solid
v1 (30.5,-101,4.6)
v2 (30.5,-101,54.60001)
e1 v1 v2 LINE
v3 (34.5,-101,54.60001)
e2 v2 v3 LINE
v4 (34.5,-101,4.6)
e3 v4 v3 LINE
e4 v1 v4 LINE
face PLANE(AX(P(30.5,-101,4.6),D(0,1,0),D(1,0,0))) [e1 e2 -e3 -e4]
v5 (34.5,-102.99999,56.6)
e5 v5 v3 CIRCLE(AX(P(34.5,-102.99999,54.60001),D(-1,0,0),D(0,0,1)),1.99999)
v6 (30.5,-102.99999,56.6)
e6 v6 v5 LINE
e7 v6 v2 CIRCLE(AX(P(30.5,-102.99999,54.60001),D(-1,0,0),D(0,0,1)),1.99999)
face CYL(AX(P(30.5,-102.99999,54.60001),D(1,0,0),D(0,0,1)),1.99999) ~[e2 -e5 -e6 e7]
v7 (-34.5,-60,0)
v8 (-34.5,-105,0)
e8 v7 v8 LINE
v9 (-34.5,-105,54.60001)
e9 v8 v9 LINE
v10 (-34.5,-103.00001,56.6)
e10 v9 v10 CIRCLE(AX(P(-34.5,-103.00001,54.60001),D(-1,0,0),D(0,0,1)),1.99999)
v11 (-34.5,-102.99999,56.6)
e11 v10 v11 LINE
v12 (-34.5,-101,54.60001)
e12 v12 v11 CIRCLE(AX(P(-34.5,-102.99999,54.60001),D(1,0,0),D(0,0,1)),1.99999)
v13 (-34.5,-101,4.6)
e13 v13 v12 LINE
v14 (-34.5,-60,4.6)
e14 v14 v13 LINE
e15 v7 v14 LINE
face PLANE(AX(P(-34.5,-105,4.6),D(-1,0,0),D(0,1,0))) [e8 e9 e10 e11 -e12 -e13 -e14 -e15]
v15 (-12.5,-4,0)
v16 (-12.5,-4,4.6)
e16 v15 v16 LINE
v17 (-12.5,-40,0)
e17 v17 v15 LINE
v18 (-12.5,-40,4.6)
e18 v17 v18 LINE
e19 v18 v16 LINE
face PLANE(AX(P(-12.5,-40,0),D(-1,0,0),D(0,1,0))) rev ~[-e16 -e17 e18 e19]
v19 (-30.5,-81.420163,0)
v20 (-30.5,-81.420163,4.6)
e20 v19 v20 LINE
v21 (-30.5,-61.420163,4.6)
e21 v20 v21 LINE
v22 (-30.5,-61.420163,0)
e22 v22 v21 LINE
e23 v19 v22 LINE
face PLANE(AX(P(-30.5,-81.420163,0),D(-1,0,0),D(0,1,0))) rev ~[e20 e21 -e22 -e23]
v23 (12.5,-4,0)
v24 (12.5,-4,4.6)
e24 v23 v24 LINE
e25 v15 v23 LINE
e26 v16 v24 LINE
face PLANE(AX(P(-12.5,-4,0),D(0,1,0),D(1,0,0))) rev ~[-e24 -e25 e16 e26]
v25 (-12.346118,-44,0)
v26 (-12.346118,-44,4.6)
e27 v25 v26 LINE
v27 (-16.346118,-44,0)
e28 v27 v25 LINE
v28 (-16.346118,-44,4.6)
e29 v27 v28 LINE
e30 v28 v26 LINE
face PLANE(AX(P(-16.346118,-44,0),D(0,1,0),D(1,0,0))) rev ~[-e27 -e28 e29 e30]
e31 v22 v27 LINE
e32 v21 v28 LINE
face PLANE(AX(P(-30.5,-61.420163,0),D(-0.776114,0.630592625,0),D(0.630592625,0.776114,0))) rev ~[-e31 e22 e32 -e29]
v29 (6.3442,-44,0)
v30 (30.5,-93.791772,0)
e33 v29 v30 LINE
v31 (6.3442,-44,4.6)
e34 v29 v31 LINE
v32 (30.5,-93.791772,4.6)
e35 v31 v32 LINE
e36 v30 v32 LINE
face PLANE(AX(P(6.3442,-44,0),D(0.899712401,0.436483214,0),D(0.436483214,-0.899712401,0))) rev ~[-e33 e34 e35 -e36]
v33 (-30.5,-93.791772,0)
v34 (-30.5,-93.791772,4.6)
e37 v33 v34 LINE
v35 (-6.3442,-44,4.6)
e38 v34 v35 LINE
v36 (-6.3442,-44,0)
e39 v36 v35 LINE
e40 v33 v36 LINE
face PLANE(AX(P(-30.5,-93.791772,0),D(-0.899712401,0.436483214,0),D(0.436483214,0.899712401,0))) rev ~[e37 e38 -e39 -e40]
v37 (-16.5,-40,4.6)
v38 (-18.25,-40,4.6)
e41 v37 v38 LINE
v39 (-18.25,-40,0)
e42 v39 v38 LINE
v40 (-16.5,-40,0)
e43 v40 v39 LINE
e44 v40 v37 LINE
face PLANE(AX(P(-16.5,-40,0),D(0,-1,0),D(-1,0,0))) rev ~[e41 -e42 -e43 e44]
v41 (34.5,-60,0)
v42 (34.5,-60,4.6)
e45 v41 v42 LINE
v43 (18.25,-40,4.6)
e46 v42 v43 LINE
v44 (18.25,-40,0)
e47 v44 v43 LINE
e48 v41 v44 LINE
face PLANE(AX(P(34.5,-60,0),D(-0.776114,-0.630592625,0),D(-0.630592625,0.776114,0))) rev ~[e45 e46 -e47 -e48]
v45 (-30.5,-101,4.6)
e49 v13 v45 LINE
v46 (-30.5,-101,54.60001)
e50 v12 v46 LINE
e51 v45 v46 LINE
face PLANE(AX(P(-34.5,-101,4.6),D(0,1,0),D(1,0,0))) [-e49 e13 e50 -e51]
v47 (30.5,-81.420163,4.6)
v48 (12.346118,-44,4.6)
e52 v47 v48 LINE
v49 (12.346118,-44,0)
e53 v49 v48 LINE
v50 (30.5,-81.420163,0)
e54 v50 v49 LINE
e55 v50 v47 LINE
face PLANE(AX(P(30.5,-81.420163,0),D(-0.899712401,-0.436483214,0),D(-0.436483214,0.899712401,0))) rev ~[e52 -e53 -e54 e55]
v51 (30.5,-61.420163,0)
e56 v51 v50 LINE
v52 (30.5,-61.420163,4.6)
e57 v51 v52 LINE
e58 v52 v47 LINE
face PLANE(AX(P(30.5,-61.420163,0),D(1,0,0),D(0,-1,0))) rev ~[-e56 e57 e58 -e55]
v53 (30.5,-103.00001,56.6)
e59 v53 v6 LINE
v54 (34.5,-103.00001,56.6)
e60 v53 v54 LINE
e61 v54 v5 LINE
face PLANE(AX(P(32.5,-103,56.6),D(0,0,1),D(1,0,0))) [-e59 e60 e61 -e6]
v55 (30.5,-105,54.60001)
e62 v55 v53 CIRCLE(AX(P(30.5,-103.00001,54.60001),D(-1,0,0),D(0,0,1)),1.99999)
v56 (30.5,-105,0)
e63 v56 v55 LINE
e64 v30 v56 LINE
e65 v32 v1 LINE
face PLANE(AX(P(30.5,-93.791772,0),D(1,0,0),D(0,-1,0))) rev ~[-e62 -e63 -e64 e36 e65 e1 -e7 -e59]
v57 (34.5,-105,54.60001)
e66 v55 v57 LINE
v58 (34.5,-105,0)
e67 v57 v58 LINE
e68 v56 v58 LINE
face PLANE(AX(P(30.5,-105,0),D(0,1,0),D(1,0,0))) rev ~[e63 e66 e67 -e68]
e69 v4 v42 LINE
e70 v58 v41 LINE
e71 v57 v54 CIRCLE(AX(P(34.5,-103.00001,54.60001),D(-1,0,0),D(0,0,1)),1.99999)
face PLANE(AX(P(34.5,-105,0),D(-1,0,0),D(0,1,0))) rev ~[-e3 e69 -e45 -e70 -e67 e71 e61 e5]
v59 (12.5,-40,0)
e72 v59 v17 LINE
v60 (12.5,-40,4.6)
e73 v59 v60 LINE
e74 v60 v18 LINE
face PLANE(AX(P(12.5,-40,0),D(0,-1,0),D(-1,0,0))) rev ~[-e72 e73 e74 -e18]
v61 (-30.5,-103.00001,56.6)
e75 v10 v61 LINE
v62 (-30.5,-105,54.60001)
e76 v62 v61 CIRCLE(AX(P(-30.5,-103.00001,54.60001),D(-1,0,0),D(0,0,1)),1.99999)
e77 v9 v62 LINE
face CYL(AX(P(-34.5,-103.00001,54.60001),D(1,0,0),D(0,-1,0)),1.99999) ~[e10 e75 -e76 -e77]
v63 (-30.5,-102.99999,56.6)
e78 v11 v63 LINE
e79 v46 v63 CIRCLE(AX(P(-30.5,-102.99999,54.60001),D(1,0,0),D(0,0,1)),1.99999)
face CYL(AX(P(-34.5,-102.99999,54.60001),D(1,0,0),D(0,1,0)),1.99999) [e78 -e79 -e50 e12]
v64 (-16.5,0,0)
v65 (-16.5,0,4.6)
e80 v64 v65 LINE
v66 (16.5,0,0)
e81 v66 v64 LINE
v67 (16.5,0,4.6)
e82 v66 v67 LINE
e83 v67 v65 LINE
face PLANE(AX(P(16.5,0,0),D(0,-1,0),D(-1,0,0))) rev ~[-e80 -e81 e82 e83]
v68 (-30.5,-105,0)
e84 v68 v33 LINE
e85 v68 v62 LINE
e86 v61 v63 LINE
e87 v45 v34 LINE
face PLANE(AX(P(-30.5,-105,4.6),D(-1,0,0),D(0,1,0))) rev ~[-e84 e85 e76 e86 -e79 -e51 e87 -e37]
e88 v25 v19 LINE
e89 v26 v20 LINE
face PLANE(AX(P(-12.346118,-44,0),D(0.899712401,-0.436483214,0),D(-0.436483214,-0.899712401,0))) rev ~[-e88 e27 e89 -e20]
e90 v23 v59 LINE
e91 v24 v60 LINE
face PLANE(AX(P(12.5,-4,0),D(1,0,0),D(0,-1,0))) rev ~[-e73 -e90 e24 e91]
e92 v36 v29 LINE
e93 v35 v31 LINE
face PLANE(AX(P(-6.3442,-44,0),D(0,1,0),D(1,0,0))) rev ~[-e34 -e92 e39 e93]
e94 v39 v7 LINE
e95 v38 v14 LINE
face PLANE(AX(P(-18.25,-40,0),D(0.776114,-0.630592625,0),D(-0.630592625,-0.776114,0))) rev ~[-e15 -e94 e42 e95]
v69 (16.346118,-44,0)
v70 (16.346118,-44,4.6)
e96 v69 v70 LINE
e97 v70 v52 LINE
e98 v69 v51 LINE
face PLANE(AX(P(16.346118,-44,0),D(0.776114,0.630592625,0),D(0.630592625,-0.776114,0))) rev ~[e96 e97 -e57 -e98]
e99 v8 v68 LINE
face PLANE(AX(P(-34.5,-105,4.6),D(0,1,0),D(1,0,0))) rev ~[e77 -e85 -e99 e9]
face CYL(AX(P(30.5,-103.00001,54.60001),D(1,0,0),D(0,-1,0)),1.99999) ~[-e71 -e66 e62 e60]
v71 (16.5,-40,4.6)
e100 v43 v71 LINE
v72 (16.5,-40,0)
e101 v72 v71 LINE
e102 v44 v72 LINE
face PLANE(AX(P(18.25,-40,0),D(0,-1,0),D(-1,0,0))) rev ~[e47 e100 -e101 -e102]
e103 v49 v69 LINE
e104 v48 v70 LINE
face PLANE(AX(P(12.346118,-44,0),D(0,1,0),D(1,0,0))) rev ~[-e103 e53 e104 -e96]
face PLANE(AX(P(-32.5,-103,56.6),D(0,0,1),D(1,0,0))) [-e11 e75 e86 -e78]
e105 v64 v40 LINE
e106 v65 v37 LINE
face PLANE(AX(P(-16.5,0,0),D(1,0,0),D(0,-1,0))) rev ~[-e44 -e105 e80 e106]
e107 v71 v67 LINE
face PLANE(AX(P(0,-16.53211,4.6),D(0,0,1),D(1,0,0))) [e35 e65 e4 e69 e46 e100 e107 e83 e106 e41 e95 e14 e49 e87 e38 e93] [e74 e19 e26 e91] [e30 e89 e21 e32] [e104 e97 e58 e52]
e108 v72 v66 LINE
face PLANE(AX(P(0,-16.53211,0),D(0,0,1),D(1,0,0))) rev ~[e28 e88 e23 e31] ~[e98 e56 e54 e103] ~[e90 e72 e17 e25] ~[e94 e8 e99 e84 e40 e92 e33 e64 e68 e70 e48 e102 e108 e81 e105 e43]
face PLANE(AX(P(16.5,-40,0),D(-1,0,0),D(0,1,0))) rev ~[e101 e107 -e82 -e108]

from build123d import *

# Parameters (mm, degrees)
F1_DEPTH = 4.6
F2_W     = 4
F2_H     = 4
F3_DEPTH = 52
F4_R     = 1.99999


# Not quite as in the source:
# - a fillet or chamfer is up to 0.001 mm smaller than in the source, because OpenCascade refuses the exact size


with BuildPart() as f1:
    # F0 (on Top) → F1 (new body)
    with BuildSketch(Plane.XY):
        Polygon((16.5, 0), (-16.5, 0), (-16.5, -40), (-12.5, -40), (-12.5, -4), (12.5, -4), (12.5, -40), (16.5, -40), align=None)
        Polygon((-12.5, -40), (-16.5, -40), (-18.25, -40), (-34.5, -60), (-34.5, -105), (-30.5, -105), (-30.5, -93.7917722906), (-30.5, -81.420162501), (-30.5, -61.420162501), (-16.346117968, -44), (-12.346117968, -44), (-6.344200027, -44), (6.344200027, -44), (12.346117968, -44), (16.346117968, -44), (30.5, -61.420162501), (30.5, -81.420162501), (30.5, -93.7917722906), (30.5, -105), (34.5, -105), (34.5, -60), (18.25, -40), (16.5, -40), (12.5, -40), align=None)
        Polygon((-30.5, -81.420162501), (-30.5, -93.7917722906), (-6.344200027, -44), (-12.346117968, -44), align=None)
        Polygon((6.344200027, -44), (30.5, -93.7917722906), (30.5, -81.420162501), (12.346117968, -44), align=None)
    extrude(amount=F1_DEPTH)

    # F2 (on face) → F3 (join)
    with BuildSketch(Plane.XY.offset(4.6)):
        with Locations((-32.5, -103)):
            Rectangle(F2_W, F2_H)
        with Locations((32.5, -103)):
            Rectangle(F2_W, F2_H)
    extrude(amount=F3_DEPTH)

    # F4 (radius 2 in the source; OpenCascade refuses exactly that, so slightly less here)
    f4_edges = [f1.edges().sort_by_distance(p)[0] for p in [
        (-32.5, -105, 56.6),
        (-32.5, -101, 56.6),
        (32.5, -105, 56.6),
        (32.5, -101, 56.6),
    ]]
    fillet(f4_edges, radius=F4_R)


solid = f1.part
